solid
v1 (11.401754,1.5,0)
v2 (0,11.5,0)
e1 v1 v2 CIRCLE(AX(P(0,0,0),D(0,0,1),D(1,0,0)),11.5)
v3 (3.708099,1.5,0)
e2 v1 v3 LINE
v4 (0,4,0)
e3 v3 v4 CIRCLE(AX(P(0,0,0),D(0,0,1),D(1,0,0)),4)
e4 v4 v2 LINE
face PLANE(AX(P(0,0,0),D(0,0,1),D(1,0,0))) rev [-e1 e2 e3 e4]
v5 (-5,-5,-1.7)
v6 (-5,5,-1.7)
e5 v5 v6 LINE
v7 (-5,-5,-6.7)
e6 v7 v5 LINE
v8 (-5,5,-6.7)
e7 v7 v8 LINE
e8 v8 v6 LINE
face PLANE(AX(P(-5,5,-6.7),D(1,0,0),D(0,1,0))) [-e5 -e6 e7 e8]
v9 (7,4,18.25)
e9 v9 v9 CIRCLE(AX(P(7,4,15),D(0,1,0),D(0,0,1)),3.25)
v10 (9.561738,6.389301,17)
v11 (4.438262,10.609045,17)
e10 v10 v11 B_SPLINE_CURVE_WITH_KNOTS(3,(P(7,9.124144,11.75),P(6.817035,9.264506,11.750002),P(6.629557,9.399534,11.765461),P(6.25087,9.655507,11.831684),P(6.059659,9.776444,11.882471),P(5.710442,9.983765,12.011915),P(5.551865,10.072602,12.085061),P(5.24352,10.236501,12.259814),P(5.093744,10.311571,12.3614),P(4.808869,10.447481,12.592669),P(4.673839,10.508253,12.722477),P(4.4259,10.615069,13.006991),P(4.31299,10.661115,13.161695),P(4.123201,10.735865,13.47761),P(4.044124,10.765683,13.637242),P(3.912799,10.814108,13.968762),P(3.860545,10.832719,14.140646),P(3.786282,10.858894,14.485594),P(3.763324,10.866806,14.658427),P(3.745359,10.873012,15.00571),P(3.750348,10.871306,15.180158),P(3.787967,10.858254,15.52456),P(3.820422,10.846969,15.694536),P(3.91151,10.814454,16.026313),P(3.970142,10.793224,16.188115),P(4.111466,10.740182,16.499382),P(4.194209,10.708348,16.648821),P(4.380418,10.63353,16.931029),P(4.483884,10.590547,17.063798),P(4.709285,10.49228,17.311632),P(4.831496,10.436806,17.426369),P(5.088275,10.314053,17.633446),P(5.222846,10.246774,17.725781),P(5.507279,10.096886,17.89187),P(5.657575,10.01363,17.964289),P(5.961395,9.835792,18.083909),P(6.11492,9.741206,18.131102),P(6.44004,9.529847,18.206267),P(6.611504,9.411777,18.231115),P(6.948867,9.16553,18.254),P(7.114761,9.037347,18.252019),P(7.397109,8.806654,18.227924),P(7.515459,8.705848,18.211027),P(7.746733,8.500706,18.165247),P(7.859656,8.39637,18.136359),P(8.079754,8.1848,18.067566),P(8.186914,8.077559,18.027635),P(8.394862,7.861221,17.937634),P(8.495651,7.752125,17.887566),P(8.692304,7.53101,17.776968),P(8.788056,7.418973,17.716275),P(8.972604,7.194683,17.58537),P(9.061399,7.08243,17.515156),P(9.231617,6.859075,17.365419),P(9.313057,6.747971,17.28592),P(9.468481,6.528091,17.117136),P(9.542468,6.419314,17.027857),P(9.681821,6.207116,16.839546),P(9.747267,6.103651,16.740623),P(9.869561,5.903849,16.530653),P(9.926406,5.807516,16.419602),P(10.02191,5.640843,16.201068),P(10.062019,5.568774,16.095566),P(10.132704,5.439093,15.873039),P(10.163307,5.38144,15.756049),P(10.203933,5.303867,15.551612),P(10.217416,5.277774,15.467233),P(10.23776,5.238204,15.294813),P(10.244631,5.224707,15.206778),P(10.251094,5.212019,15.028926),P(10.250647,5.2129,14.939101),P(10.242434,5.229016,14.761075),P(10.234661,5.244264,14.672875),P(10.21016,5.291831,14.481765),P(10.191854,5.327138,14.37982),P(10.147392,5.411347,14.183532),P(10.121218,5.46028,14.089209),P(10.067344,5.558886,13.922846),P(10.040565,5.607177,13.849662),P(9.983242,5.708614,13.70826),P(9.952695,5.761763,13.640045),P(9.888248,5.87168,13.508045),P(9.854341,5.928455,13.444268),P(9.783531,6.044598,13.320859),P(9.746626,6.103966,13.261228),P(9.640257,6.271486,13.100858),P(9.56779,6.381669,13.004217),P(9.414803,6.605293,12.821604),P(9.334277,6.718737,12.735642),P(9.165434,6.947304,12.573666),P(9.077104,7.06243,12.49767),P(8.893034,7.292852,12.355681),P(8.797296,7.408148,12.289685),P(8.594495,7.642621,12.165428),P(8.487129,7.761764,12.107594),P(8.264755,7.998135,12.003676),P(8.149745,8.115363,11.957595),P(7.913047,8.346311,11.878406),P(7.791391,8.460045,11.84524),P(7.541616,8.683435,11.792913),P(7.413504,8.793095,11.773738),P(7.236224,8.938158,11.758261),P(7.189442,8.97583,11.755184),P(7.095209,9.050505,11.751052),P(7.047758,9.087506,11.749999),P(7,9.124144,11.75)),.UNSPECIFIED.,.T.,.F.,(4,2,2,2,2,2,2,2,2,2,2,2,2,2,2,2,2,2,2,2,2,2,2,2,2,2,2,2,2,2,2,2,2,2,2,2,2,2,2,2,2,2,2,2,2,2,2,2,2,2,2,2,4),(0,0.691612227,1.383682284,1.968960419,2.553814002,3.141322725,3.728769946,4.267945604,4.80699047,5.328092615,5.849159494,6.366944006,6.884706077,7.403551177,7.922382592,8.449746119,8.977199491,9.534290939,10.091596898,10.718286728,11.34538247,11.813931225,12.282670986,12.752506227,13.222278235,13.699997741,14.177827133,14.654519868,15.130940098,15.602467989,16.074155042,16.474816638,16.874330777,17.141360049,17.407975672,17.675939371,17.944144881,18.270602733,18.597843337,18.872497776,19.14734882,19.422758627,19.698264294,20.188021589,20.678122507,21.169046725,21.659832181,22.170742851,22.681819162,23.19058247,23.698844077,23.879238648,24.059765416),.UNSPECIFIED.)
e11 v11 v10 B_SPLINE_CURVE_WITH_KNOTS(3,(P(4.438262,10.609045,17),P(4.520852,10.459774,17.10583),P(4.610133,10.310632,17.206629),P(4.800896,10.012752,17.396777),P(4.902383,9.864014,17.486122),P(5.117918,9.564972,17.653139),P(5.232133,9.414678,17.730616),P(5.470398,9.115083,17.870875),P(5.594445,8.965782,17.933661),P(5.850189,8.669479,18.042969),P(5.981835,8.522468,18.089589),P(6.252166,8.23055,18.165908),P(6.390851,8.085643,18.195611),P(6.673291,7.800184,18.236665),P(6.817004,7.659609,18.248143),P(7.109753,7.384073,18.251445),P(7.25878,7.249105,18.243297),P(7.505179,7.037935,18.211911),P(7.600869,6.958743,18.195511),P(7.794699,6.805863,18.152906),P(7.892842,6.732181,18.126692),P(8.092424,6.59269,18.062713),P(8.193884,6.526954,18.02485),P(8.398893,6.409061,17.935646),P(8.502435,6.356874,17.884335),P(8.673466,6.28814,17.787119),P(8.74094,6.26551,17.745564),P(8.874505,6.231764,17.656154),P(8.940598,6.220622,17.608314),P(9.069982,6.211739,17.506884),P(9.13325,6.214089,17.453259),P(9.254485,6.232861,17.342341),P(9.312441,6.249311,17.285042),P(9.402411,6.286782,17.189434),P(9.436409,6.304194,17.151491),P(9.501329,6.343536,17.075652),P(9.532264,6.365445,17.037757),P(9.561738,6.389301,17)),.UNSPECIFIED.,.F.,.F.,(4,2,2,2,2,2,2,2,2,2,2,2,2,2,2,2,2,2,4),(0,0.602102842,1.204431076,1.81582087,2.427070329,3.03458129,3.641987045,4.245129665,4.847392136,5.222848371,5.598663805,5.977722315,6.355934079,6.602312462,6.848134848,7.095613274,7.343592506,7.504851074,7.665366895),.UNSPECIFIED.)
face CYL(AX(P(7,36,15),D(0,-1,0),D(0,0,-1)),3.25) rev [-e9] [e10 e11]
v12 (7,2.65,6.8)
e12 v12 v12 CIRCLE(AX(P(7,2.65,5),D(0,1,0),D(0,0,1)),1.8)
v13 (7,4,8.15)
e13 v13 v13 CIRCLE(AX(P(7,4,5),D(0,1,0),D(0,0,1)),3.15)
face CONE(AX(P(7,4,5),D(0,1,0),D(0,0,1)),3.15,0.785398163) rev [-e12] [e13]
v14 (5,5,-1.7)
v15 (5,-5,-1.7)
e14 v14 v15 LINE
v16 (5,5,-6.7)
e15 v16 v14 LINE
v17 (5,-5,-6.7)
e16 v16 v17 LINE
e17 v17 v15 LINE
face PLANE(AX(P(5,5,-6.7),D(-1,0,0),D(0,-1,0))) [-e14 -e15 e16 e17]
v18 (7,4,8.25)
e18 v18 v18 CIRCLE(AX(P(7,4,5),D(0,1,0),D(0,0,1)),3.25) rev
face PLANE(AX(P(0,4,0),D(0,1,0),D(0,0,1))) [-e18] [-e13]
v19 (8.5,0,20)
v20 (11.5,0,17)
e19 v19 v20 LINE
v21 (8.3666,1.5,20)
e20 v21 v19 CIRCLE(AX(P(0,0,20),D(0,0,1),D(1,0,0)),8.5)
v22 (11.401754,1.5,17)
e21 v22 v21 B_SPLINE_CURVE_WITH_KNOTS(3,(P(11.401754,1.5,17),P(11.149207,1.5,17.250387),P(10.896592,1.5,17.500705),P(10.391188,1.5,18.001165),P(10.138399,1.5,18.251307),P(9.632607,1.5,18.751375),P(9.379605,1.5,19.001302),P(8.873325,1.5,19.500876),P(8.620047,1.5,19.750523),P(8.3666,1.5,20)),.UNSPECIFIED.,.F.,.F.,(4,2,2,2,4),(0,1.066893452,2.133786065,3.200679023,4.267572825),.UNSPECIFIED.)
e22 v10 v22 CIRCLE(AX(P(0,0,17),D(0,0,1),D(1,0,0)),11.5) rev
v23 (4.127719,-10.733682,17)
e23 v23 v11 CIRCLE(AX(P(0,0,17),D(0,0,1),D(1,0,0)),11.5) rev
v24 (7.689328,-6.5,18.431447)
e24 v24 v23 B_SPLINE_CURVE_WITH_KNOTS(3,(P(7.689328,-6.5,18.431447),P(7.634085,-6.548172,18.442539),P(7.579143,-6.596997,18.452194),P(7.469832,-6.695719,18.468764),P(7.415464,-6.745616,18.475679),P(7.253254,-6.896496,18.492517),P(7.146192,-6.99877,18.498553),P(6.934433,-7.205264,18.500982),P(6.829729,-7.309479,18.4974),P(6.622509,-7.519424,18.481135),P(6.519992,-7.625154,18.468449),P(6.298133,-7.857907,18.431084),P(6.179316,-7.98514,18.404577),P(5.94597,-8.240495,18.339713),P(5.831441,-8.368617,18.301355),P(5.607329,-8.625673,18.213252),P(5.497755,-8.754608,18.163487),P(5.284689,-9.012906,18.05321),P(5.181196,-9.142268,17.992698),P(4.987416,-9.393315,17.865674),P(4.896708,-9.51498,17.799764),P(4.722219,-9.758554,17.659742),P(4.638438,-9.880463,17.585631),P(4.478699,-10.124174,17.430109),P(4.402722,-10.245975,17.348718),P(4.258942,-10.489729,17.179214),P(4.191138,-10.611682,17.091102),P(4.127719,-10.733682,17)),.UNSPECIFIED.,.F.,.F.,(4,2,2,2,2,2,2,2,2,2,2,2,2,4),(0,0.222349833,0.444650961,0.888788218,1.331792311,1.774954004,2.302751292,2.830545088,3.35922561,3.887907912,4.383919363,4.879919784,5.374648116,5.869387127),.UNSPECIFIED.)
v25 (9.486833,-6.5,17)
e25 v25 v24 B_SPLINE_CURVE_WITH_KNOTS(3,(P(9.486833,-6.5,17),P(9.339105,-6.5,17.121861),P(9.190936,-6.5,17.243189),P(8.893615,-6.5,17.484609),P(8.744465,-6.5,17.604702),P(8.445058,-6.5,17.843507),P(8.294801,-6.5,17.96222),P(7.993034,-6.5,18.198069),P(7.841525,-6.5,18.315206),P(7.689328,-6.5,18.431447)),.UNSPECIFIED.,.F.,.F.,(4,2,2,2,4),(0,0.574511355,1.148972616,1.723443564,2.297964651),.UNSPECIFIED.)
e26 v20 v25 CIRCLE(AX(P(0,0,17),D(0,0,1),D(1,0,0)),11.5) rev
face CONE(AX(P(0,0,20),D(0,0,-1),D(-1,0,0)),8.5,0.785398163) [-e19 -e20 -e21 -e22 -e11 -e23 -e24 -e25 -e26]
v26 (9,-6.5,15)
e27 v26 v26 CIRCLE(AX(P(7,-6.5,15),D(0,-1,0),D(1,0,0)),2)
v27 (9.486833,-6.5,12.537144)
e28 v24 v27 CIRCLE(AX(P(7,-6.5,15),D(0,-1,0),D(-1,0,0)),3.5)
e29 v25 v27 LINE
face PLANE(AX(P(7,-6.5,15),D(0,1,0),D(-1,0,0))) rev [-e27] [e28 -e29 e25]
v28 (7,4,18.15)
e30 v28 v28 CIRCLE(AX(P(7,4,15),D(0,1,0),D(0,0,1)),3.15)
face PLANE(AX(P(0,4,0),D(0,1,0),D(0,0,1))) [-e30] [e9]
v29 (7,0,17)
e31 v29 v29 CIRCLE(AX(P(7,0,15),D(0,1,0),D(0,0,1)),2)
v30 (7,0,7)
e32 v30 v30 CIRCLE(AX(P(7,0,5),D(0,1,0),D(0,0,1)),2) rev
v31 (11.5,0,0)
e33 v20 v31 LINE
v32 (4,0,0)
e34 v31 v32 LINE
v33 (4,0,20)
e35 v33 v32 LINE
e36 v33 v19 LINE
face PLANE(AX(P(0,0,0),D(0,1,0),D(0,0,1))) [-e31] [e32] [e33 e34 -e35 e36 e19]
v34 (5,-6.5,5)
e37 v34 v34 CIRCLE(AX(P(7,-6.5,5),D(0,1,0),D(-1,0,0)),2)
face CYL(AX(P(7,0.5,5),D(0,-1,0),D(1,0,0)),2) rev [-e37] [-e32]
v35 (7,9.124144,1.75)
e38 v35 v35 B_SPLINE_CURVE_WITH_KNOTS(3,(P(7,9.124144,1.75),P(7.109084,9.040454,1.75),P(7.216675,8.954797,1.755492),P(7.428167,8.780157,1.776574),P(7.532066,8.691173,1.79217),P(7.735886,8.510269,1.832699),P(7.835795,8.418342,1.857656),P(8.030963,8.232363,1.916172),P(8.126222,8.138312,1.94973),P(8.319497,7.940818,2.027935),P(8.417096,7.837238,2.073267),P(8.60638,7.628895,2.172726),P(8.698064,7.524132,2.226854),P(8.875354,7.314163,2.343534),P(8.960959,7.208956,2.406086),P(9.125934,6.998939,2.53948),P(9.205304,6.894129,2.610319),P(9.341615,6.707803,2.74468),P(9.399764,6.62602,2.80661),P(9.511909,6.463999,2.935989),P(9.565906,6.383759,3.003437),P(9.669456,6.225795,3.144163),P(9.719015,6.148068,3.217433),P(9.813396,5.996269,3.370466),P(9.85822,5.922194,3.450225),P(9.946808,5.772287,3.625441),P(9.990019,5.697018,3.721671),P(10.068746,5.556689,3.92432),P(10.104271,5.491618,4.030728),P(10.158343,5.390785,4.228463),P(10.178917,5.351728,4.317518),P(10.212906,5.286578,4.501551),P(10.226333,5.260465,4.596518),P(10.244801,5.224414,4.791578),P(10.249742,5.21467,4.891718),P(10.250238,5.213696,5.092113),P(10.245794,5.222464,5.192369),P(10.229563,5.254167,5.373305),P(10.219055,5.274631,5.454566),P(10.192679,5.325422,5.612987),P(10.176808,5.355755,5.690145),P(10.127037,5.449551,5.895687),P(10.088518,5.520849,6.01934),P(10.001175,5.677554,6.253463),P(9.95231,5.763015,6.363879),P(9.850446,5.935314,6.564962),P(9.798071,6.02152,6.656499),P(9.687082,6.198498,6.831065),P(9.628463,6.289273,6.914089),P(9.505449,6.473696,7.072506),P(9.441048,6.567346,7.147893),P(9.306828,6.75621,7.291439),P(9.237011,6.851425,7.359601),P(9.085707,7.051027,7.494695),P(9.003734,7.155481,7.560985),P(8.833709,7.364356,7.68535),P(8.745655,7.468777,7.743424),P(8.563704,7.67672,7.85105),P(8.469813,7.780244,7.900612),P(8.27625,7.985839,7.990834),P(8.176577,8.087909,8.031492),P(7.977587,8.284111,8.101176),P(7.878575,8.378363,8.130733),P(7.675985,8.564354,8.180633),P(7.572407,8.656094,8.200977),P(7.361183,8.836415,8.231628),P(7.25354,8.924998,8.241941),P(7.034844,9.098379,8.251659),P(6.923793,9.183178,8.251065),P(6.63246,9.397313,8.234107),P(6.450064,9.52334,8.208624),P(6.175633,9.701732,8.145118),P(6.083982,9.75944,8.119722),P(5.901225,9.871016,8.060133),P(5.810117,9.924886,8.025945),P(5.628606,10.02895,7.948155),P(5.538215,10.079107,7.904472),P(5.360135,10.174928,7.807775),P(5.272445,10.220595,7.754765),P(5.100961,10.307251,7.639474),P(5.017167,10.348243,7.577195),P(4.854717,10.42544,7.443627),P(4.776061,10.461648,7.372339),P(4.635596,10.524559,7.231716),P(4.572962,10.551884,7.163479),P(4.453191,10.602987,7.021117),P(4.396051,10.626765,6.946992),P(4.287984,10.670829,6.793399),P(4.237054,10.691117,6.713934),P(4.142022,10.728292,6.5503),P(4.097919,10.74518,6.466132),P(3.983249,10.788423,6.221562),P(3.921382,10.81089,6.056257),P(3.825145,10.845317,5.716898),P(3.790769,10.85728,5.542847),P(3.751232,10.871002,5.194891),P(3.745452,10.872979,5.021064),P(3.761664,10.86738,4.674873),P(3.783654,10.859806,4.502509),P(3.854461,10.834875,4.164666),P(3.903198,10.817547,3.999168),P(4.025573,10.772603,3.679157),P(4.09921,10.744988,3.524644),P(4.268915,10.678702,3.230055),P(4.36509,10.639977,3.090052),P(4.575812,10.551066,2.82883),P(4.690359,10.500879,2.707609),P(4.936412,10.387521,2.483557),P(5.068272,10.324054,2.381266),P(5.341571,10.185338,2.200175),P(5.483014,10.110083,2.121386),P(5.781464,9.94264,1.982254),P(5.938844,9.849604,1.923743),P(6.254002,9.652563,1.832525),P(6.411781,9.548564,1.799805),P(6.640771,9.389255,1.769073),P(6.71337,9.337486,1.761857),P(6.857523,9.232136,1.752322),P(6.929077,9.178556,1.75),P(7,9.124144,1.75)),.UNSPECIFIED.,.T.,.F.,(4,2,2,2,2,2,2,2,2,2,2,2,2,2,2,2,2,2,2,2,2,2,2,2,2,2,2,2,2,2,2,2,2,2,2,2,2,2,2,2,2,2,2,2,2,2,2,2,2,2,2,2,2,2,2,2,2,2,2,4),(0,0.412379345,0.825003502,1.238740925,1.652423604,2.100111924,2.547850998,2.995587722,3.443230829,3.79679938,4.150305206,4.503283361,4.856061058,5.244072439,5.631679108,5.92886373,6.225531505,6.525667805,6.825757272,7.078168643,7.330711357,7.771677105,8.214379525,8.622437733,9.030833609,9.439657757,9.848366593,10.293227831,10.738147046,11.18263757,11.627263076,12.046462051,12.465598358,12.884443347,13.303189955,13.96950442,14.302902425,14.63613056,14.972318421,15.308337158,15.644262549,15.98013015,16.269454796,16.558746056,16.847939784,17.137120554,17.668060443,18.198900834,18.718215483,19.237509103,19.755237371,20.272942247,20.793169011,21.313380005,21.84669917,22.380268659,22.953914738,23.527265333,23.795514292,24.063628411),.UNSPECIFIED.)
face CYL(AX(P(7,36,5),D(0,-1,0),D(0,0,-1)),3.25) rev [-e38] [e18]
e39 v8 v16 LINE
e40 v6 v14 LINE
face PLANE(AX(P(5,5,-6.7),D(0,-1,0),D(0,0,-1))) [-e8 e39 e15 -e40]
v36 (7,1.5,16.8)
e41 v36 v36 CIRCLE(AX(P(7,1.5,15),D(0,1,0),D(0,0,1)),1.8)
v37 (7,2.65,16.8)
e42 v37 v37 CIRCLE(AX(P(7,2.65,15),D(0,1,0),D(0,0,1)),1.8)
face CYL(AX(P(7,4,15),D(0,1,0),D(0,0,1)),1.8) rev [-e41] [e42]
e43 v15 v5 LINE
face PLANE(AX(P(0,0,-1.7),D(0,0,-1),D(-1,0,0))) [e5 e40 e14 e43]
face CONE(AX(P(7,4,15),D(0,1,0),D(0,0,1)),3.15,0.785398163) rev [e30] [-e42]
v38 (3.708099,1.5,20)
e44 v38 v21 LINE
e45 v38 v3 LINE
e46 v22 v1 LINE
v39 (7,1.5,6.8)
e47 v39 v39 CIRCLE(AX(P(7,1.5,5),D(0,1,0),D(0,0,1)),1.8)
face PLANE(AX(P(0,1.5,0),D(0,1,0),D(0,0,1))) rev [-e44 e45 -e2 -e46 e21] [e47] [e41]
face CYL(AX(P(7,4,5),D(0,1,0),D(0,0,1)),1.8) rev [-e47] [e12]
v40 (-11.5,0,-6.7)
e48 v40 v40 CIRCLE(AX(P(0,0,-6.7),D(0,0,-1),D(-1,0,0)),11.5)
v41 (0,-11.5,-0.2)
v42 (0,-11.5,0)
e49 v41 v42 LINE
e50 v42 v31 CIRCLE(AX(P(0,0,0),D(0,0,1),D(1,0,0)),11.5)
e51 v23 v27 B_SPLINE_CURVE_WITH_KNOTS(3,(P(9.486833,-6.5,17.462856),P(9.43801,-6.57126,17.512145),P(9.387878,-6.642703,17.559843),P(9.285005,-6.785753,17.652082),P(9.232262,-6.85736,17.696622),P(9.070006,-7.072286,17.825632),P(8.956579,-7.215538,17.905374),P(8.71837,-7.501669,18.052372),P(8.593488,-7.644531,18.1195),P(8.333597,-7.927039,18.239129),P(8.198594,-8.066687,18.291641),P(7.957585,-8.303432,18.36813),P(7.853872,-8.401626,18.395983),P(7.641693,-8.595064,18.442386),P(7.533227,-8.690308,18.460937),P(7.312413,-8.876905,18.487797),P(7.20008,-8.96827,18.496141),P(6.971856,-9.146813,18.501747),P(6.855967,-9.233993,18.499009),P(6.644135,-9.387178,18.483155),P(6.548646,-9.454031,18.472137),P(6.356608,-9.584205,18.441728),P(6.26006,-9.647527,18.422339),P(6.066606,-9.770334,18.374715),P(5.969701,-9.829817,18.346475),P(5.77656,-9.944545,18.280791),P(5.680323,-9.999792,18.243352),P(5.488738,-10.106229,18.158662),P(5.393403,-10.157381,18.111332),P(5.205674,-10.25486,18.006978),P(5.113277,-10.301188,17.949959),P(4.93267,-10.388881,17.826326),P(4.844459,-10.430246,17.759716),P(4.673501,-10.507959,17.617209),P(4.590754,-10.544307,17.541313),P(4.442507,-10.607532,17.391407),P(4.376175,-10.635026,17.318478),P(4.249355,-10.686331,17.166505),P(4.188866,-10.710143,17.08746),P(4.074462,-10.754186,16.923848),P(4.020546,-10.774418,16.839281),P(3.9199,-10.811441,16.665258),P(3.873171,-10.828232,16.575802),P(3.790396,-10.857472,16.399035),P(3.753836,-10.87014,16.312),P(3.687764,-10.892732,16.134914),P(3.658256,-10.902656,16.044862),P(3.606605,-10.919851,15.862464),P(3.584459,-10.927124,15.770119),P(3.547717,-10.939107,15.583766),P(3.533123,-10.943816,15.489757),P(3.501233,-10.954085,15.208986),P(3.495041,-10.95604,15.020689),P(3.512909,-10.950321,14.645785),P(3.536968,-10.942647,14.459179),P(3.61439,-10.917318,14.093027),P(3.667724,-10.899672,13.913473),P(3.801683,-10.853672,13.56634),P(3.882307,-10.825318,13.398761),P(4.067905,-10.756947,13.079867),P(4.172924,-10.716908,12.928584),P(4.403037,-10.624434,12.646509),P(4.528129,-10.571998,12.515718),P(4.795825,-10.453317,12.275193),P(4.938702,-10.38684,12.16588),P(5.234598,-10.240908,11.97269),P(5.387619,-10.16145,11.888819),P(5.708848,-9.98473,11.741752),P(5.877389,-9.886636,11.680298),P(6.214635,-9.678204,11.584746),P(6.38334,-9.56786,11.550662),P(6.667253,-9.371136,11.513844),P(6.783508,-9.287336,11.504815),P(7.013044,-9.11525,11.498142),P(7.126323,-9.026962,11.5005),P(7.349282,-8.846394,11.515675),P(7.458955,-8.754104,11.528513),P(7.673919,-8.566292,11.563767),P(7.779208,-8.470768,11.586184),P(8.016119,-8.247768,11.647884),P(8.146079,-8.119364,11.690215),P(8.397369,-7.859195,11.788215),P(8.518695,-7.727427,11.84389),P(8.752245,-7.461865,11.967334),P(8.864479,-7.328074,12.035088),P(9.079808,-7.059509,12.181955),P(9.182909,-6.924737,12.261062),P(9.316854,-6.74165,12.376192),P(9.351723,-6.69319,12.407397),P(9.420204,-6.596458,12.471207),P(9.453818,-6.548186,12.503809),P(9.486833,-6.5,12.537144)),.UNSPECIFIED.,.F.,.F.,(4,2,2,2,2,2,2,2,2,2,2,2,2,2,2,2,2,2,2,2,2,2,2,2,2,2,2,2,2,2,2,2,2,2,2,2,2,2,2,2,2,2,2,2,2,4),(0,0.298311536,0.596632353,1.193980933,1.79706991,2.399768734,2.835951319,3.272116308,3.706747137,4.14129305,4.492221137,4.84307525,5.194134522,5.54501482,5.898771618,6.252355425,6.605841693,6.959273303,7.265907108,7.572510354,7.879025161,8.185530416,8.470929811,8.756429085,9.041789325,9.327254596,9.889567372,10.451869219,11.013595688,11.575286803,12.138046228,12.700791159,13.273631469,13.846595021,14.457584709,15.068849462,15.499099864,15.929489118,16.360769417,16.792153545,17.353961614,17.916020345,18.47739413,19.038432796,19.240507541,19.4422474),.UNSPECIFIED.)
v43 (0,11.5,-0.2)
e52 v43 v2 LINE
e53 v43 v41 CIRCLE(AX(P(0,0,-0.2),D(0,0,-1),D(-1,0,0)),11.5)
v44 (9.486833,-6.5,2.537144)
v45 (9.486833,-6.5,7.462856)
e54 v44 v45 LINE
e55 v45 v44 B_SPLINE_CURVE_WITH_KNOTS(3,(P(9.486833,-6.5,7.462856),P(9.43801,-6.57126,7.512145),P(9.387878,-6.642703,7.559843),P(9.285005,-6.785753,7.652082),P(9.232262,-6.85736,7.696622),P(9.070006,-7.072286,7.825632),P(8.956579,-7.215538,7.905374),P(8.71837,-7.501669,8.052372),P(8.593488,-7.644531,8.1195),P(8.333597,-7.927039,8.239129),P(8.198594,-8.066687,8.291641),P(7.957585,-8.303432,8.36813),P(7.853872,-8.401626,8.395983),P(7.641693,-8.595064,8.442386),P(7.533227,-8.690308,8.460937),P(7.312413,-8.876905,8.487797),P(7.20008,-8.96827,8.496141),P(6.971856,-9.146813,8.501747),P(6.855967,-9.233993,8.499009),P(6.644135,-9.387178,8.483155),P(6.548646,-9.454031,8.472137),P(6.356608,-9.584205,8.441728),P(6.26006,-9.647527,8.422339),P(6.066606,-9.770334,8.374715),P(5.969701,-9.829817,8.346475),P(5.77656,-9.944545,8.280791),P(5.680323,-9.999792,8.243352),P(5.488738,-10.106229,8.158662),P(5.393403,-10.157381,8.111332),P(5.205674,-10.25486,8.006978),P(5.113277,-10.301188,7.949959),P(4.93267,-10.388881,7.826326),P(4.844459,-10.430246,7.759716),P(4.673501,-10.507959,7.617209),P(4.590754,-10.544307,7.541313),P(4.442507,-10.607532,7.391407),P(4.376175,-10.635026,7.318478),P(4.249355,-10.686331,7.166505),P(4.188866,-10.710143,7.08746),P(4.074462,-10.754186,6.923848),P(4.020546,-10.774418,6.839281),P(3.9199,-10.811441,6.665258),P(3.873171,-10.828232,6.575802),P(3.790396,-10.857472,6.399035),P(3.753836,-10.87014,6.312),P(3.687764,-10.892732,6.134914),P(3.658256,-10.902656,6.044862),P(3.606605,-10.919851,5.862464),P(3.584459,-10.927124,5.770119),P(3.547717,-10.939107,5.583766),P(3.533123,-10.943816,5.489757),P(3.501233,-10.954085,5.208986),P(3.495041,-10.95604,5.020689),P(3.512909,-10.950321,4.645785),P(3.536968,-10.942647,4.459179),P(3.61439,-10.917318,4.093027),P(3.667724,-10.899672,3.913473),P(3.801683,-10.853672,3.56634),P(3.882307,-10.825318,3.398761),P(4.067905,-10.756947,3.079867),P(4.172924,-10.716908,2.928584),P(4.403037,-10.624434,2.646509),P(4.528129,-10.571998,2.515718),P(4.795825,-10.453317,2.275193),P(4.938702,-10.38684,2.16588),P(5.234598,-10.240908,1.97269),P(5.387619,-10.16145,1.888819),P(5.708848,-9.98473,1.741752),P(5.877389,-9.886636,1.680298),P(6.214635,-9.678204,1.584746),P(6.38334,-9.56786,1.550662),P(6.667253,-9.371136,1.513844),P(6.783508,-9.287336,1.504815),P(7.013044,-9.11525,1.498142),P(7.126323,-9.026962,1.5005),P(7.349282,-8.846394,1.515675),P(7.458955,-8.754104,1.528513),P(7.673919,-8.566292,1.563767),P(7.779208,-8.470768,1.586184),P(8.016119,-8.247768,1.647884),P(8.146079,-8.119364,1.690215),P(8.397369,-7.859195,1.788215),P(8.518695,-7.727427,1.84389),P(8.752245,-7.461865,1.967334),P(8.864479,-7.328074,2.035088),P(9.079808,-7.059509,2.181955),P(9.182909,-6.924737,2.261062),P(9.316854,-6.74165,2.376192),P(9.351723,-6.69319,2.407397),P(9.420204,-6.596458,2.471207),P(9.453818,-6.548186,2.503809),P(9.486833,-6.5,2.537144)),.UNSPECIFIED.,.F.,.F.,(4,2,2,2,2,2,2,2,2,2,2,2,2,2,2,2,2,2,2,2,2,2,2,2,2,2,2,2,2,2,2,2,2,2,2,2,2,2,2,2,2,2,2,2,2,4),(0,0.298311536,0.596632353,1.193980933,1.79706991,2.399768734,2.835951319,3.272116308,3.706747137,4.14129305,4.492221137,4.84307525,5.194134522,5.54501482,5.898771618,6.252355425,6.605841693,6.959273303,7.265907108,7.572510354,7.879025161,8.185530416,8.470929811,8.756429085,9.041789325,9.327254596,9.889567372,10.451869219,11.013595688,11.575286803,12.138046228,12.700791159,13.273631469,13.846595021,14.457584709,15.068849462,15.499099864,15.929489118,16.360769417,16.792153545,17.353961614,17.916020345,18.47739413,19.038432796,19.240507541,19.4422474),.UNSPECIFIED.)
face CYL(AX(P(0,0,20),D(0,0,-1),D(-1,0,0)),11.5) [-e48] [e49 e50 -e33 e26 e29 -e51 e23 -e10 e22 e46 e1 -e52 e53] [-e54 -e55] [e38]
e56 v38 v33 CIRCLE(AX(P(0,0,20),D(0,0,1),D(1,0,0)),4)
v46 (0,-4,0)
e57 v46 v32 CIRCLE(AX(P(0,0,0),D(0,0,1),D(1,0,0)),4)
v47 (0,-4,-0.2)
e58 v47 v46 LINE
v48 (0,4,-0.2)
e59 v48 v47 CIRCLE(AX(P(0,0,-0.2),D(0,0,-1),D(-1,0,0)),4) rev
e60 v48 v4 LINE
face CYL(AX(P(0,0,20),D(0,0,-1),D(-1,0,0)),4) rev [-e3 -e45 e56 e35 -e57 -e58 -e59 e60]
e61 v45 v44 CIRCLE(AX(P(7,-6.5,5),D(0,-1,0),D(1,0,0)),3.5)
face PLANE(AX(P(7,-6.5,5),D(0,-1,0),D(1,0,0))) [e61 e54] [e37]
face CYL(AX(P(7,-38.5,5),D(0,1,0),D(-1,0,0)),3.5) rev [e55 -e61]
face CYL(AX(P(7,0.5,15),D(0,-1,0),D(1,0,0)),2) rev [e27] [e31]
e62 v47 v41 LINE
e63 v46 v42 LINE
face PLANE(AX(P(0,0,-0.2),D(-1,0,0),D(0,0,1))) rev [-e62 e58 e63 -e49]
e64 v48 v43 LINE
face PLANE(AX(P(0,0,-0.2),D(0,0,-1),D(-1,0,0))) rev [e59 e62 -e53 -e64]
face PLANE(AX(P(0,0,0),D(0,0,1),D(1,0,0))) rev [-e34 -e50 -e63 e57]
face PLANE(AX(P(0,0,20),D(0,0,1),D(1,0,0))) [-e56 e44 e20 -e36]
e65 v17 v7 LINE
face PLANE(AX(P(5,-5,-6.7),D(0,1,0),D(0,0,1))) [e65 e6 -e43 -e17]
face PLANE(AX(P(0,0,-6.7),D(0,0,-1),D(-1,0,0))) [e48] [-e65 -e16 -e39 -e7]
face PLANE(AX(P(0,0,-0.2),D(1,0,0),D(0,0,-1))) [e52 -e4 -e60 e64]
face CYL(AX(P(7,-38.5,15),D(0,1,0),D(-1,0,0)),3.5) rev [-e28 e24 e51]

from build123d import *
from build123d.topology import SkipClean

# Parameters (mm, degrees)
SZKIC1_R                                           = 11.5
SZKIC1_R_2                                         = 4
DODANIE_WYCI_GNI_CIE1_DEPTH                        = 20
SZKIC3_W                                           = 11.5
SZKIC3_H                                           = 20
WYTNIJ_WYCI_GNI_CIE1_DEPTH                         = 1.5
WYTNIJ_WYCI_GNI_CIE2_DEPTH                         = 32
POG_BIENIE_STO_KOWE_POD_M3_WKR_T_Z_BEM_D           = 3.6
POG_BIENIE_STO_KOWE_POD_M3_WKR_T_Z_BEM_CSINK_D     = 6.3
POG_BIENIE_STO_KOWE_POD_M3_WKR_T_Z_BEM_CSINK_ANGLE = 90
SZKIC7_R                                           = 3.5
WYTNIJ_WYCI_GNI_CIE3_DEPTH                         = 32
SZKIC8_R                                           = 2
WYTNIJ_WYCI_GNI_CIE4_DEPTH                         = 7
DODANIE_WYCI_GNI_CIE2_START                        = 0.2
DODANIE_WYCI_GNI_CIE2_DEPTH                        = 0.2
DODANIE_WYCI_GNI_CIE3_START                        = 1.5
SZKIC10_R                                          = 11.5
DODANIE_WYCI_GNI_CIE3_DEPTH                        = 1.5
DODANIE_WYCI_GNI_CIE4_START                        = 5
SZKIC11_R                                          = 11.5
SZKIC11_W                                          = 10
SZKIC11_H                                          = 10
DODANIE_WYCI_GNI_CIE4_DEPTH                        = 5
SFAZOWANIE1_SIZE                                   = 3


with BuildPart() as part:
    # Szkic1 → Dodanie-wyciągnięcie1 (new body)
    with BuildSketch(Plane.XY):
        with Locations(Location((0, 0, 0), (0, 0, 180))):
            Circle(SZKIC1_R)
        with Locations(Location((0, 0, 0), (0, 0, 180))):
            Circle(SZKIC1_R_2, mode=Mode.SUBTRACT)
    extrude(amount=DODANIE_WYCI_GNI_CIE1_DEPTH)

    # Szkic3 → Wytnij-wyciągnięcie1 (cut)
    with BuildSketch(Plane(origin=(0, 0, 0), x_dir=(1, 0, 0), z_dir=(0, 1, 0))):
        with Locations((5.75, -10)):
            Rectangle(SZKIC3_W, SZKIC3_H)
    extrude(amount=WYTNIJ_WYCI_GNI_CIE1_DEPTH, mode=Mode.SUBTRACT)

    # Szkic4 → Wytnij-wyciągnięcie2 (cut)
    with BuildSketch(Plane(origin=(0, 4, 0), x_dir=(1, 0, 0), z_dir=(0, 1, 0))):
        with BuildLine():
            ThreePointArc((7, -11.75), (3.75, -15), (7, -18.25))
            Line((7, -18.25), (7, -11.75))
        make_face()
        with BuildLine():
            Line((7, -11.75), (7, -18.25))
            ThreePointArc((7, -18.25), (9.298097039, -17.298097039), (10.25, -15))
            ThreePointArc((10.25, -15), (9.298097039, -12.701902961), (7, -11.75))
        make_face()
        with BuildLine():
            ThreePointArc((7, -1.75), (3.75, -5), (7, -8.25))
            Line((7, -8.25), (7, -1.75))
        make_face()
        with BuildLine():
            Line((7, -1.75), (7, -8.25))
            ThreePointArc((7, -8.25), (9.298097039, -7.298097039), (10.25, -5))
            ThreePointArc((10.25, -5), (9.298097039, -2.701902961), (7, -1.75))
        make_face()
    extrude(amount=WYTNIJ_WYCI_GNI_CIE2_DEPTH, mode=Mode.SUBTRACT)

    # Pogłębienie stożkowe pod M3 Wkręt z łbem płaskim1 (through all)
    with Locations(Plane(origin=(7, 4, 15), x_dir=(0, 0, 1), z_dir=(0, 1, 0))):
        with Locations((0, 0), (-10, 0)):
            CounterSinkHole(POG_BIENIE_STO_KOWE_POD_M3_WKR_T_Z_BEM_D / 2, POG_BIENIE_STO_KOWE_POD_M3_WKR_T_Z_BEM_CSINK_D / 2, counter_sink_angle=POG_BIENIE_STO_KOWE_POD_M3_WKR_T_Z_BEM_CSINK_ANGLE)

    # Szkic7 → Wytnij-wyciągnięcie3 (cut)
    with BuildSketch(Plane(origin=(0, -6.5, 0), x_dir=(-1, 0, 0), z_dir=(0, -1, 0))):
        with Locations((-7, -5)):
            Circle(SZKIC7_R)
        with Locations((-7, -15)):
            Circle(SZKIC7_R)
    extrude(amount=WYTNIJ_WYCI_GNI_CIE3_DEPTH, mode=Mode.SUBTRACT)

    # Szkic8 → Wytnij-wyciągnięcie4 (cut)
    with BuildSketch(Plane.XZ.offset(6.5)):
        with Locations((7, 15)):
            Circle(SZKIC8_R)
        with Locations(Location((7, 5, 0), (0, 0, 90))):
            Circle(SZKIC8_R)
    extrude(amount=-WYTNIJ_WYCI_GNI_CIE4_DEPTH, mode=Mode.SUBTRACT)

    # Szkic9 → Dodanie-wyciągnięcie2 (add)
    with SkipClean():  # the faces are left unmerged after this step: merging them gives an invalid solid
        with BuildSketch(Plane(origin=(0, 0, 0), x_dir=(-1, 0, 0), z_dir=(0, 0, -1)).offset(DODANIE_WYCI_GNI_CIE2_START)):
            with BuildLine():
                Line((0, 11.5), (0, 4))
                ThreePointArc((0, 4), (4, 0), (0, -4))
                Line((0, -4), (0, -11.5))
                ThreePointArc((0, -11.5), (11.5, 0), (0, 11.5))
            make_face()
        extrude(amount=-DODANIE_WYCI_GNI_CIE2_DEPTH)

    # Szkic10 → Dodanie-wyciągnięcie3 (add)
    with SkipClean():  # the faces are left unmerged after this step: merging them gives an invalid solid
        with BuildSketch(Plane(origin=(0, 0, -0.2), x_dir=(-1, 0, 0), z_dir=(0, 0, -1)).offset(DODANIE_WYCI_GNI_CIE3_START)):
            Circle(SZKIC10_R)
        extrude(amount=-DODANIE_WYCI_GNI_CIE3_DEPTH)

    # Szkic11 → Dodanie-wyciągnięcie4 (add)
    with SkipClean():  # the faces are left unmerged after this step: merging them gives an invalid solid
        with BuildSketch(Plane(origin=(0, 0, -1.7), x_dir=(-1, 0, 0), z_dir=(0, 0, -1)).offset(DODANIE_WYCI_GNI_CIE4_START)):
            Circle(SZKIC11_R)
            Rectangle(SZKIC11_W, SZKIC11_H, mode=Mode.SUBTRACT)
        extrude(amount=-DODANIE_WYCI_GNI_CIE4_DEPTH)

    # Sfazowanie1
    # the kernel refuses this chamfer: 3 mm, written as the material it takes off along each edge
    with BuildSketch(Plane(origin=(0, 0, 20), x_dir=(-1, 0, 0), z_dir=(0, 1, 0))) as sfazowanie1_piece_1:
        Polygon((11.5, -SFAZOWANIE1_SIZE), (11.5 - SFAZOWANIE1_SIZE, 0), (11.5, 0), align=None)
    revolve(axis=Axis((0, 0, 20), (0, 0, 1)), revolution_arc=218.500054596, mode=Mode.SUBTRACT)
    with BuildSketch(Plane(origin=(0, 0, 20), x_dir=(0.8571646812696857, -0.5150424343525863, 0), z_dir=(-0.5150424343525863, -0.8571646812696857, 0))) as sfazowanie1_piece_2:
        Polygon((11.5, -SFAZOWANIE1_SIZE), (11.5 - SFAZOWANIE1_SIZE, 0), (11.5, 0), align=None)
    revolve(axis=Axis((0, 0, 20), (0, 0, 1)), revolution_arc=211.000291399, mode=Mode.SUBTRACT)


solid = part.part
